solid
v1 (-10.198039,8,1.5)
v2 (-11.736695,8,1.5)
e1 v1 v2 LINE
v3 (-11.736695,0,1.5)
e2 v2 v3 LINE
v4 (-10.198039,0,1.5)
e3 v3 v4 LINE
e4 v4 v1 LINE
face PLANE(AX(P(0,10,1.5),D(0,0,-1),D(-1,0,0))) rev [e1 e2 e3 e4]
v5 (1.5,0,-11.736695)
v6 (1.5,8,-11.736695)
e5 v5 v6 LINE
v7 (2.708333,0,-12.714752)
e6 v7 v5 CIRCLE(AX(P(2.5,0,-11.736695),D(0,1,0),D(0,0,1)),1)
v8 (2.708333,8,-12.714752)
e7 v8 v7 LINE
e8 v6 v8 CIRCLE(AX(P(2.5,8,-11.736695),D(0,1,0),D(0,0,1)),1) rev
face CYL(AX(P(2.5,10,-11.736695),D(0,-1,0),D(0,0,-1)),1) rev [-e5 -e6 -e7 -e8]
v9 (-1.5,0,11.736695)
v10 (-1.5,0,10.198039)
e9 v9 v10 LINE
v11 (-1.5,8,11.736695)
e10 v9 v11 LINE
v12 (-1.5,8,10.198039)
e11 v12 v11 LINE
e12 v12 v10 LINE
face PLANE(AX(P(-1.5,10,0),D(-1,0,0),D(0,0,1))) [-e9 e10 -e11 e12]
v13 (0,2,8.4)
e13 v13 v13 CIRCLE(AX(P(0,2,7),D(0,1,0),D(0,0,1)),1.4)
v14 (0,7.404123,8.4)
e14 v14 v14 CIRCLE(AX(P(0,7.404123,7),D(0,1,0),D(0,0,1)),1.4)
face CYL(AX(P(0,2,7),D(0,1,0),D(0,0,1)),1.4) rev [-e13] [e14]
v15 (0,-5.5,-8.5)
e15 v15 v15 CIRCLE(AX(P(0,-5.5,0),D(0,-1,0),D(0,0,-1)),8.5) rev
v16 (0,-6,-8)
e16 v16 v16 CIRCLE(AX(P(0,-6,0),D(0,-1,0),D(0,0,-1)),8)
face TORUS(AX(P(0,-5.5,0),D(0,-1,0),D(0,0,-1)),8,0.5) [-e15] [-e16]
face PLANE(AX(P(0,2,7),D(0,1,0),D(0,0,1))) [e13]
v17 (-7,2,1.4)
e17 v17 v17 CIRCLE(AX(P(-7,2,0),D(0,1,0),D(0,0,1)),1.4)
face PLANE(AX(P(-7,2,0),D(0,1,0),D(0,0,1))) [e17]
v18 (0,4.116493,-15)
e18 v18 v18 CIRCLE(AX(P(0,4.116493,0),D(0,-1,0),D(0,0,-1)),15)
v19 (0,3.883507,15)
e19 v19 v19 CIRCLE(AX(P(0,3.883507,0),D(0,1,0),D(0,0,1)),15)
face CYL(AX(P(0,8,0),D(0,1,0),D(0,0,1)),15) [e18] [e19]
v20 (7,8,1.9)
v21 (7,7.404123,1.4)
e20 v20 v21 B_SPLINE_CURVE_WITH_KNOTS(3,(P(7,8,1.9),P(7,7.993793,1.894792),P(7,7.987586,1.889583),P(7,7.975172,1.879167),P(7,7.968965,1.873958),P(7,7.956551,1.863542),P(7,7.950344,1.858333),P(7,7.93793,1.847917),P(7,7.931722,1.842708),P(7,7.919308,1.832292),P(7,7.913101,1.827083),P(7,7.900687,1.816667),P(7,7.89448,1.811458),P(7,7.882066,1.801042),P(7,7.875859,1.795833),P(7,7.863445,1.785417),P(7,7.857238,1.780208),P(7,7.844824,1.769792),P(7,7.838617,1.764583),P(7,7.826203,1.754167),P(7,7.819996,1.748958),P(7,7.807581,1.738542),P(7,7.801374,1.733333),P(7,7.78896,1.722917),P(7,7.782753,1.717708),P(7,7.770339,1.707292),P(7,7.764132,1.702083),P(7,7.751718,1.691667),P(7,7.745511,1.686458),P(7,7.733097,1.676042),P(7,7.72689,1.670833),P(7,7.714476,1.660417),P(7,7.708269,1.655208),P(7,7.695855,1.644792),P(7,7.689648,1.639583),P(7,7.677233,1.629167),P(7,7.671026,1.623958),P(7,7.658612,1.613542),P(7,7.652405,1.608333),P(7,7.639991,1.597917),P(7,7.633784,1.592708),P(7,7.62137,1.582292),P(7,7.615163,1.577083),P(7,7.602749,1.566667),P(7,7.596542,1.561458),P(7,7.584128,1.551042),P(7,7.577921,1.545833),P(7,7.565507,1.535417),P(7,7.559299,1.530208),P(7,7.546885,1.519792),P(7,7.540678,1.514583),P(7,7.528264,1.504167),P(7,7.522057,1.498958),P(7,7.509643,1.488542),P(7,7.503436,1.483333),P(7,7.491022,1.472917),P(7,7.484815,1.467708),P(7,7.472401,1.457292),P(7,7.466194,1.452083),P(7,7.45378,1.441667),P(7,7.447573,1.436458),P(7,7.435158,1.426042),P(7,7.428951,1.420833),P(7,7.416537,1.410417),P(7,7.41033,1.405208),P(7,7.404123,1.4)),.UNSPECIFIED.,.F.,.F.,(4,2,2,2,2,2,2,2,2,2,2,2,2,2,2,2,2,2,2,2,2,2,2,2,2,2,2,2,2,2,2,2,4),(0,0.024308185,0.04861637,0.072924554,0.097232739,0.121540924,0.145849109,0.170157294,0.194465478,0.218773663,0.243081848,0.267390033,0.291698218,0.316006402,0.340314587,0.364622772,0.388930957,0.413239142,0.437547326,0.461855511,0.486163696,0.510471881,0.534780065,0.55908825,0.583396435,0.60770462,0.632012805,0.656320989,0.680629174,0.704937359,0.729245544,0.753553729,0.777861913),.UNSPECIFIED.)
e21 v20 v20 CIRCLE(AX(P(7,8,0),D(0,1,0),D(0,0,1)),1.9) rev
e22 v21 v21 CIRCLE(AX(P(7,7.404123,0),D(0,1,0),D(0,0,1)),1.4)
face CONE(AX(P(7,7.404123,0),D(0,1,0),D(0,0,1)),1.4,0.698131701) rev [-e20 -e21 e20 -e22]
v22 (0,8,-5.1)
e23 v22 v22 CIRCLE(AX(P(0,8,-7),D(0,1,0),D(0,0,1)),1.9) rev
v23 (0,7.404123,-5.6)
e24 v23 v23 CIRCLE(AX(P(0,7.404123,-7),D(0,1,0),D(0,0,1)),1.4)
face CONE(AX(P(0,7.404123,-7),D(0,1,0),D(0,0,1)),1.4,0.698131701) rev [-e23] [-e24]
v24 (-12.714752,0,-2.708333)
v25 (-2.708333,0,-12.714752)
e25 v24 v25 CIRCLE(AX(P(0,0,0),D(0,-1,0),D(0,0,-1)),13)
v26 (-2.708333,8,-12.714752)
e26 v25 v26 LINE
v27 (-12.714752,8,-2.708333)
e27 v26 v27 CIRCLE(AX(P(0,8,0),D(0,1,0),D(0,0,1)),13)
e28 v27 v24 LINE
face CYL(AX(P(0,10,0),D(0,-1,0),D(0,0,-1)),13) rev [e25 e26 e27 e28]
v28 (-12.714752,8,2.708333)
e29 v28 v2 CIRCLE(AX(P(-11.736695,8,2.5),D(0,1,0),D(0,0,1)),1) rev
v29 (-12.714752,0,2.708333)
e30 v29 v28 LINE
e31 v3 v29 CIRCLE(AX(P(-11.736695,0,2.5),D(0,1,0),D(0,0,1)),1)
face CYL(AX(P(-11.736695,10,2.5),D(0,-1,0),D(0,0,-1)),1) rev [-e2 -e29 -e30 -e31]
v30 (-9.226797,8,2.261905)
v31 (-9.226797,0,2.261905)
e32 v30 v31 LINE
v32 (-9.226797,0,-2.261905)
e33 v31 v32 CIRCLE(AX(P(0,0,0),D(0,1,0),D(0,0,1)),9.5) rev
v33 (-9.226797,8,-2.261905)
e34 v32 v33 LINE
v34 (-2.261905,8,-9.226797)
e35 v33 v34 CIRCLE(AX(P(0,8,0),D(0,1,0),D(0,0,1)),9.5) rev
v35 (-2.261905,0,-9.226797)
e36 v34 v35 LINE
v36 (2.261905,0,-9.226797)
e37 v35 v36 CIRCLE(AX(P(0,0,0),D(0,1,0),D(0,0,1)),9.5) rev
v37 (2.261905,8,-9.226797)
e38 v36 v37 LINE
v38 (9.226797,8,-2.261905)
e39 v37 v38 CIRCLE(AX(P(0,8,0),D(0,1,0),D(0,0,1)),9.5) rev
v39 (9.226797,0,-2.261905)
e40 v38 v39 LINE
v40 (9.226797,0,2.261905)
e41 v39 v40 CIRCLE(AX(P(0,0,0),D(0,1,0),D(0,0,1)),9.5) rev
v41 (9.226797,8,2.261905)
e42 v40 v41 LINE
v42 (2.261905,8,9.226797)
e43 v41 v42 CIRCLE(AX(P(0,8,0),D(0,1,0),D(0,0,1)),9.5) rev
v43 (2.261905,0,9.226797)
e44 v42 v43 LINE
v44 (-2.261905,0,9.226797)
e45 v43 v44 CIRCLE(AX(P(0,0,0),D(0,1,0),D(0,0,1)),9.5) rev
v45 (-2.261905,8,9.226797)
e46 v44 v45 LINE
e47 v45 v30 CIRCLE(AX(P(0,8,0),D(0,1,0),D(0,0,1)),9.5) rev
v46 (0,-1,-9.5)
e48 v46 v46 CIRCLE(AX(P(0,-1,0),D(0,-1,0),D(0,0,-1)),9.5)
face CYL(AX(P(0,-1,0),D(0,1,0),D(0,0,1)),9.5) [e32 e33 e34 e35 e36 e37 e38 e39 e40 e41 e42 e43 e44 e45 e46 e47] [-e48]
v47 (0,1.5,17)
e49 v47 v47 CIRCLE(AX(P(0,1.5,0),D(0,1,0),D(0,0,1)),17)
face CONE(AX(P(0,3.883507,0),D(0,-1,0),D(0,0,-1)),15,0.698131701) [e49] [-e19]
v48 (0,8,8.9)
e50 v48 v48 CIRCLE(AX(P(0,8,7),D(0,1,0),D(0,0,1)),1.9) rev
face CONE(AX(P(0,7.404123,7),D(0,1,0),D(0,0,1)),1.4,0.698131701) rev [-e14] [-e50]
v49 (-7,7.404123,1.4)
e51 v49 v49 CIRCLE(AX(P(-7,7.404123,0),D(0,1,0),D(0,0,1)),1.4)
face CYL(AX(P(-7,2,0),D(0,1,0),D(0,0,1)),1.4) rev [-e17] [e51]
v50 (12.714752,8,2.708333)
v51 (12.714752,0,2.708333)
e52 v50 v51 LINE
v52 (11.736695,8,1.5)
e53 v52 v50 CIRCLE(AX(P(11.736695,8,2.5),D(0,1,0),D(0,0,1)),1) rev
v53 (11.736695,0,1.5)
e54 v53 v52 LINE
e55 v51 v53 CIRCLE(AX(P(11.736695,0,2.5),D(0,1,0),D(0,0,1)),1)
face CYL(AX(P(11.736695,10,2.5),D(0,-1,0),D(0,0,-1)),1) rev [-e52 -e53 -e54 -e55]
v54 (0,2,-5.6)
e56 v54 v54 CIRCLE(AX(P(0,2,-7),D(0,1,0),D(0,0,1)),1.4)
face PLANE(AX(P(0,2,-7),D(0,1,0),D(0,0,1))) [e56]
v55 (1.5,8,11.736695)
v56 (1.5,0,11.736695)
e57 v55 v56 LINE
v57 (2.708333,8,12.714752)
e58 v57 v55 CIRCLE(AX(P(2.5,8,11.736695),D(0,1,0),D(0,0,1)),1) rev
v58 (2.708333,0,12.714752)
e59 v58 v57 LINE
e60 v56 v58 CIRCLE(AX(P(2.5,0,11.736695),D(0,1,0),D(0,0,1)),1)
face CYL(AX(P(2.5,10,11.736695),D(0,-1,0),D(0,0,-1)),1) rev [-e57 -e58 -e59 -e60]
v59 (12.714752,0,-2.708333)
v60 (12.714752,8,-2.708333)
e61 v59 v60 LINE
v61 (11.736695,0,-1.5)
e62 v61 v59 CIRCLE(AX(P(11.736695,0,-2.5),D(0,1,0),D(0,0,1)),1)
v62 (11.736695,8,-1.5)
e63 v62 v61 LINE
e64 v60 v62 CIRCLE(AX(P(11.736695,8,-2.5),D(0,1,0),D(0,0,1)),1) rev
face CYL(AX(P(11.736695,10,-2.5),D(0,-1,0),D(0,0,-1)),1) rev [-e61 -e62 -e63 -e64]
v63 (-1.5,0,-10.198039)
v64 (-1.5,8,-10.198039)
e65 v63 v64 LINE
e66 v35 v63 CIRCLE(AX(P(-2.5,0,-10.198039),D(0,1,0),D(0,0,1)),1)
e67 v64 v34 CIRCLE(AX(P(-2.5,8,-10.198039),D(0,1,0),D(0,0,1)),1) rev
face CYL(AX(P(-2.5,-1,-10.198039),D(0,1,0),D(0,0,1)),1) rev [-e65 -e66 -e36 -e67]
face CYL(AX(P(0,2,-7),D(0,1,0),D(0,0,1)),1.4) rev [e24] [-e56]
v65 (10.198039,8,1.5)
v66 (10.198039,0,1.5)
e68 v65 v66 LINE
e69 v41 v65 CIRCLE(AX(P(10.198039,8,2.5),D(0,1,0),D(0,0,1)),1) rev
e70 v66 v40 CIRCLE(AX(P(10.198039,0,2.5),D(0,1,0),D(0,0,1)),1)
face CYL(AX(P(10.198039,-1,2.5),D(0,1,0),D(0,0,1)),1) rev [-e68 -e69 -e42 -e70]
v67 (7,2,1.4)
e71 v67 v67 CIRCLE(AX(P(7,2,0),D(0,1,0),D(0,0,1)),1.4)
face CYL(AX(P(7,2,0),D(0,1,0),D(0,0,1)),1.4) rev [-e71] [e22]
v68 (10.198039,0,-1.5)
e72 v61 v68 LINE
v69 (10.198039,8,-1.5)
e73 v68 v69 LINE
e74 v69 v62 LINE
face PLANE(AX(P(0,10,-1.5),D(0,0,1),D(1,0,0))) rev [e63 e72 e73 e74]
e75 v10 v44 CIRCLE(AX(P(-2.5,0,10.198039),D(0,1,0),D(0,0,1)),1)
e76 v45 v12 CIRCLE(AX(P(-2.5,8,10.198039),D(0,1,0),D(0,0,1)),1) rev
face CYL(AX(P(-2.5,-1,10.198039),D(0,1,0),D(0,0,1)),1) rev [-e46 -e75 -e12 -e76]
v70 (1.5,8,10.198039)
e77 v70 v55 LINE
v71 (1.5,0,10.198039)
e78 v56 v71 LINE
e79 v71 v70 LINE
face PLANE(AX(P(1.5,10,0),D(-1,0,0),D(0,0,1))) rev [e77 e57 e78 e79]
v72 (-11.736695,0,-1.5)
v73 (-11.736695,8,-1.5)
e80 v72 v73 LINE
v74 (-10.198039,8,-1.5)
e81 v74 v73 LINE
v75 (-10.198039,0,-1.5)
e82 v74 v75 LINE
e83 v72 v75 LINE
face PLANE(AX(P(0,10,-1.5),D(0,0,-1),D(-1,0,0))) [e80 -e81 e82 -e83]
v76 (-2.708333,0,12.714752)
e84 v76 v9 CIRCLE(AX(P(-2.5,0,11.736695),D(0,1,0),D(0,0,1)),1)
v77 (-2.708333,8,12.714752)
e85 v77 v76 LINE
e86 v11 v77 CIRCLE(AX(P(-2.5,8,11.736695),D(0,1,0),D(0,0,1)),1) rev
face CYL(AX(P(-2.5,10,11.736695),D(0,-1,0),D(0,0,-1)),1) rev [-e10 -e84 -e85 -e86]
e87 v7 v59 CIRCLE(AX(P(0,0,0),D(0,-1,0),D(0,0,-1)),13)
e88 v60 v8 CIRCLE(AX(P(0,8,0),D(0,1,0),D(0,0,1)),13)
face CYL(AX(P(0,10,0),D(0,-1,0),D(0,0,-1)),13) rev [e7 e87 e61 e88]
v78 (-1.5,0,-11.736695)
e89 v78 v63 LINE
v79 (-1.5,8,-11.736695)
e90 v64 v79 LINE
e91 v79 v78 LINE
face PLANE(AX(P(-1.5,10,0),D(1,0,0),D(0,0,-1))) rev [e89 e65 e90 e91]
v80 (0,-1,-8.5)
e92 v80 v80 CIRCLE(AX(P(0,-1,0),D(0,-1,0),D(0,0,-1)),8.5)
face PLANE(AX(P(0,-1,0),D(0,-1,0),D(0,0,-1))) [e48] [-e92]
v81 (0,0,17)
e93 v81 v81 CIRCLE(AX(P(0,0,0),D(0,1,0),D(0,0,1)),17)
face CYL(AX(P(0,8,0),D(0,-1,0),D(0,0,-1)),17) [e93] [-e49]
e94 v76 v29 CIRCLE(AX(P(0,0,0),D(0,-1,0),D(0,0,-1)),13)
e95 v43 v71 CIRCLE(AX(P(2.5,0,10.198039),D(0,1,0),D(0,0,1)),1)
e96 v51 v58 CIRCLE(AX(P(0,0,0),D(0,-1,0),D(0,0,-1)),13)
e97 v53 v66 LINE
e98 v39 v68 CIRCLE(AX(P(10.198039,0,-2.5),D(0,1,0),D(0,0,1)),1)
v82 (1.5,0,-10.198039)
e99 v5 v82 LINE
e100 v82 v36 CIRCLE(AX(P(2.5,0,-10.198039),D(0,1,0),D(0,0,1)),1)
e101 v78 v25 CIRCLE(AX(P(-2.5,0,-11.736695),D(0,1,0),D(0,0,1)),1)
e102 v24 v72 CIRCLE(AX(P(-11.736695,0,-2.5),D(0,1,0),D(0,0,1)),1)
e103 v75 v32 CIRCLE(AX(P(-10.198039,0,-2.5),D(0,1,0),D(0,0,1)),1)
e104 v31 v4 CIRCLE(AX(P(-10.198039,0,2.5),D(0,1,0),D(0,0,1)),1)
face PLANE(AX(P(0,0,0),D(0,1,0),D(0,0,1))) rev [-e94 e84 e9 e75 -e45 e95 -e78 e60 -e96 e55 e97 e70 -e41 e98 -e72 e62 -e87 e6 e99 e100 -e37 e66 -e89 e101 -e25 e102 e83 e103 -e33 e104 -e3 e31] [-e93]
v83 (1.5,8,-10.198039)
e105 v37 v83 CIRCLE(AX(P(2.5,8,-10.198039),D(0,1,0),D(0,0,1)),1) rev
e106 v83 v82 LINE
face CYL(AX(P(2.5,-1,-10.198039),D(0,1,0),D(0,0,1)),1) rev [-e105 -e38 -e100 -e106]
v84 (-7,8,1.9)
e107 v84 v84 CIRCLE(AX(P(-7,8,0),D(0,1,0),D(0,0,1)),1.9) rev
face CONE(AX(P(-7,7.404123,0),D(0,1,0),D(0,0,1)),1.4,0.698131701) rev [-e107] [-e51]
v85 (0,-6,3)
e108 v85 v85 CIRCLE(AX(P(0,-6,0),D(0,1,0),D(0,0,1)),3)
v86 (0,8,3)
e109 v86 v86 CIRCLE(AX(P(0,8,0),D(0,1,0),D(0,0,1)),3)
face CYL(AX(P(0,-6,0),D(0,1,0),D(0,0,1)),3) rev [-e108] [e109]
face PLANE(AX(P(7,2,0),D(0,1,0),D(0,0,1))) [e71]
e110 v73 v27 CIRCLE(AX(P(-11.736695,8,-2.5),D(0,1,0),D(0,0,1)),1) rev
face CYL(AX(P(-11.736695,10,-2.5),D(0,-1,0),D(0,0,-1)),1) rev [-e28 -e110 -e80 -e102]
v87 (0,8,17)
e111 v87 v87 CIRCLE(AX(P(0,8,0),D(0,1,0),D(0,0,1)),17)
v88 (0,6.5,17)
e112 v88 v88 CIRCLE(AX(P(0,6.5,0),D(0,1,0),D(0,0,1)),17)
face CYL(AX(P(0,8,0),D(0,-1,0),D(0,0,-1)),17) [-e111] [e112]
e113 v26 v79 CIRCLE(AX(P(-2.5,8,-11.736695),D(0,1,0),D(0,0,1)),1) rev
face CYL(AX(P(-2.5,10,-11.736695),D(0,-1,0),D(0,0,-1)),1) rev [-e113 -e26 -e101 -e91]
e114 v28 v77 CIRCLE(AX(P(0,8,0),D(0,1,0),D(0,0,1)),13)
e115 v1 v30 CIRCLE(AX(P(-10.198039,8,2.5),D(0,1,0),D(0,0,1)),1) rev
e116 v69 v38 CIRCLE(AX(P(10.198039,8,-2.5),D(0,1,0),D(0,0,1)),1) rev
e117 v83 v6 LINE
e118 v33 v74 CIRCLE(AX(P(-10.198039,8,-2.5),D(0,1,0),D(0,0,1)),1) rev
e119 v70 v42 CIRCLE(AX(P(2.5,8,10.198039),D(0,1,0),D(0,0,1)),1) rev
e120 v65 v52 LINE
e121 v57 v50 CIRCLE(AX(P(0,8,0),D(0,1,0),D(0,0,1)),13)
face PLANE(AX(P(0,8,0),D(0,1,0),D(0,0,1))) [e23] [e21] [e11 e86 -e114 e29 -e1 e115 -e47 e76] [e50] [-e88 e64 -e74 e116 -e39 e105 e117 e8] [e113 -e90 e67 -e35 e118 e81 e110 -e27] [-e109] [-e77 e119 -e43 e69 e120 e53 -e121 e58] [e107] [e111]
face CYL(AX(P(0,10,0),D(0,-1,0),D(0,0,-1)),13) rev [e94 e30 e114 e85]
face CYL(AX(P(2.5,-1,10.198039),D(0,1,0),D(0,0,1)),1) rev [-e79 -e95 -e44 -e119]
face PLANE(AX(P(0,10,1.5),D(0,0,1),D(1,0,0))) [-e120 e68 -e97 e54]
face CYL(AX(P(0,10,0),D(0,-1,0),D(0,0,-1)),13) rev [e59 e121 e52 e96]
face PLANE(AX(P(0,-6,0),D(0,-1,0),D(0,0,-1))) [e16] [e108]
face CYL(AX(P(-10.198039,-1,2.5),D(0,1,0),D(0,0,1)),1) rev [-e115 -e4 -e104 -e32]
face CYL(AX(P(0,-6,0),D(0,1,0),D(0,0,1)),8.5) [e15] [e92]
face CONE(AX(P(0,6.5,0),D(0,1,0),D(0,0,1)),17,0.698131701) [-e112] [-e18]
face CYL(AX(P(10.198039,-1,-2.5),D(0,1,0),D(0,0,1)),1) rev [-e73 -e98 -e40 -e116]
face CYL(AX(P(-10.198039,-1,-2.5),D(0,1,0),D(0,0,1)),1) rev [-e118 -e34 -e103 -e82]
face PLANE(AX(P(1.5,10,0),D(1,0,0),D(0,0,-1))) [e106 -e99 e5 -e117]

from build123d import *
from OCP.BRepFilletAPI import BRepFilletAPI_MakeChamfer

# Parameters (mm, degrees)
SKETCH_1_R          = 17
SKETCH_1_R_2        = 1.4
EXTRUDE_1_DEPTH     = 8
SKETCH_2_W          = 2
SKETCH_2_H          = 5
SKETCH_5_R          = 1.4
CUT_EXTRUDE_3_DEPTH = 6
SKETCH_6_R          = 8.5
EXTRUDE_2_DEPTH     = 6
SKETCH_4_R          = 3
CUT_EXTRUDE_2_DEPTH = 28.820855486
SKETCH_7_R          = 9.5
SKETCH_7_R_2        = 8.5
EXTRUDE_3_DEPTH     = 1
CHAMFER_1_SIZE      = 2.383507185
CHAMFER_1_SIZE_2    = 2
FILLET_1_R          = 0.5
CUT_EXTRUDE_START   = -10
CUT_EXTRUDE_4_DEPTH = 10
FILLET_2_R          = 1
CHAMFER_2_SIZE      = 0.5
CHAMFER_2_SIZE2     = 0.595876796


with BuildPart() as part:
    # 草图1 → 凸台-拉伸1 (new body)
    # profile 1 of 5: a face of its own
    with BuildSketch(Plane(origin=(0, 0, 0), x_dir=(1, 0, 0), z_dir=(0, 1, 0))):
        with Locations(Location((0, 0, 0), (0, 0, 270))):
            Circle(SKETCH_1_R)
        with Locations((-7, 0)):
            Circle(SKETCH_1_R_2, mode=Mode.SUBTRACT)
        with Locations((0, -7)):
            Circle(SKETCH_1_R_2, mode=Mode.SUBTRACT)
        with Locations((7, 0)):
            Circle(SKETCH_1_R_2, mode=Mode.SUBTRACT)
        with Locations((0, 7)):
            Circle(SKETCH_1_R_2, mode=Mode.SUBTRACT)
    # profile 2 of 5: a face of its own
    with BuildSketch(Plane(origin=(0, 0, 0), x_dir=(1, 0, 0), z_dir=(0, 1, 0))):
        with Locations((0, 7)):
            Circle(SKETCH_1_R_2)
    # profile 3 of 5: a face of its own
    with BuildSketch(Plane(origin=(0, 0, 0), x_dir=(1, 0, 0), z_dir=(0, 1, 0))):
        with Locations((-7, 0)):
            Circle(SKETCH_1_R_2)
    # profile 4 of 5: a face of its own
    with BuildSketch(Plane(origin=(0, 0, 0), x_dir=(1, 0, 0), z_dir=(0, 1, 0))):
        with Locations((0, -7)):
            Circle(SKETCH_1_R_2)
    # profile 5 of 5: a face of its own
    with BuildSketch(Plane(origin=(0, 0, 0), x_dir=(1, 0, 0), z_dir=(0, 1, 0))):
        with Locations((7, 0)):
            Circle(SKETCH_1_R_2)
    extrude(amount=EXTRUDE_1_DEPTH)

    # 草图2 → 切除-旋转1 (revolve, cut)
    with BuildSketch(Plane.XY, mode=Mode.PRIVATE) as cut_revolve_1_sk:
        with Locations((16, 4)):
            Rectangle(SKETCH_2_W, SKETCH_2_H)
    revolve(cut_revolve_1_sk.sketch.rotate(Axis((0, 8, 0), (0, -1, 0)), 90), axis=Axis((0, 8, 0), (0, -1, 0)), mode=Mode.SUBTRACT)

    # 草图5 → 切除-拉伸3 (cut)
    with BuildSketch(Plane(origin=(0, 8, 0), x_dir=(1, 0, 0), z_dir=(0, 1, 0))):
        with Locations(Location((0, 7, 0), (0, 0, 270))):
            Circle(SKETCH_5_R)
        with Locations(Location((7, 0, 0), (0, 0, 270))):
            Circle(SKETCH_5_R)
        with Locations(Location((0, -7, 0), (0, 0, 270))):
            Circle(SKETCH_5_R)
        with Locations(Location((-7, 0, 0), (0, 0, 270))):
            Circle(SKETCH_5_R)
    extrude(amount=-CUT_EXTRUDE_3_DEPTH, mode=Mode.SUBTRACT)

    # 草图6 → 凸台-拉伸2 (add)
    with BuildSketch(Plane.XZ):
        with Locations(Location((0, 0, 0), (0, 0, 270))):
            Circle(SKETCH_6_R)
    extrude(amount=EXTRUDE_2_DEPTH)

    # 草图4 → 切除-拉伸2 (cut, through all)
    with BuildSketch(Plane(origin=(0, 8, 0), x_dir=(1, 0, 0), z_dir=(0, 1, 0))):
        with Locations(Location((0, 0, 0), (0, 0, 270))):
            Circle(SKETCH_4_R)
    extrude(amount=-CUT_EXTRUDE_2_DEPTH, mode=Mode.SUBTRACT)

    # 草图7 → 凸台-拉伸3 (add)
    with BuildSketch(Plane.XZ):
        with Locations(Location((0, 0, 0), (0, 0, 90))):
            Circle(SKETCH_7_R)
        with Locations(Location((0, 0, 0), (0, 0, 270))):
            Circle(SKETCH_7_R_2, mode=Mode.SUBTRACT)
    extrude(amount=EXTRUDE_3_DEPTH)

    # 倒角1
    chamfer_1_edges_1 = [part.edges().sort_by_distance(p)[0] for p in [
        (0, 6.5, -15),
    ]]
    chamfer_1_side_1 = [part.faces().sort_by_distance(p)[0] for p in [
        (0, 6.46, -15),
    ]]
    chamfer_1_edges_2 = [part.edges().sort_by_distance(p)[0] for p in [
        (0, 1.5, -15),
    ]]
    chamfer_1_side_2 = [part.faces().sort_by_distance(p)[0] for p in [
        (0, 1.5, -15.04),
    ]]
    chamfer_1 = BRepFilletAPI_MakeChamfer(part.part.solid().wrapped)
    for e in chamfer_1_edges_1:
        chamfer_1.Add(CHAMFER_1_SIZE - 0.0001, CHAMFER_1_SIZE_2 - 0.0001, e.wrapped, chamfer_1_side_1[0].wrapped)
    for e in chamfer_1_edges_2:
        chamfer_1.Add(CHAMFER_1_SIZE_2 - 0.0001, CHAMFER_1_SIZE - 0.0001, e.wrapped, chamfer_1_side_2[0].wrapped)
    add(Compound.cast(chamfer_1.Shape()), mode=Mode.REPLACE)  # a hair under: the kernel refuses the full size

    # 圆角1
    fillet_1_edges = [part.edges().sort_by_distance(p)[0] for p in [
        (0, -6, 8.5),
    ]]
    fillet(fillet_1_edges, radius=FILLET_1_R)

    # 草图8 → 切除-拉伸4 (cut)
    with BuildSketch(Plane.XZ.offset(CUT_EXTRUDE_START)):
        with BuildLine():
            Line((-1.5, 9.38083152), (-1.5, 12.91317157))
            ThreePointArc((-1.5, 12.91317157), (-9.192388155, 9.192388155), (-12.91317157, 1.5))
            Line((-12.91317157, 1.5), (-9.38083152, 1.5))
            ThreePointArc((-9.38083152, 1.5), (-6.717514421, 6.717514421), (-1.5, 9.38083152))
        make_face()
        with BuildLine():
            Line((-9.38083152, -1.5), (-12.91317157, -1.5))
            ThreePointArc((-12.91317157, -1.5), (-9.192388155, -9.192388155), (-1.5, -12.91317157))
            Line((-1.5, -12.91317157), (-1.5, -9.38083152))
            ThreePointArc((-1.5, -9.38083152), (-6.717514421, -6.717514421), (-9.38083152, -1.5))
        make_face()
        with BuildLine():
            ThreePointArc((1.5, -12.91317157), (9.192388155, -9.192388155), (12.91317157, -1.5))
            Line((12.91317157, -1.5), (9.38083152, -1.5))
            ThreePointArc((9.38083152, -1.5), (6.717514421, -6.717514421), (1.5, -9.38083152))
            Line((1.5, -9.38083152), (1.5, -12.91317157))
        make_face()
        with BuildLine():
            ThreePointArc((12.91317157, 1.5), (9.192388155, 9.192388155), (1.5, 12.91317157))
            Line((1.5, 12.91317157), (1.5, 9.38083152))
            ThreePointArc((1.5, 9.38083152), (6.717514421, 6.717514421), (9.38083152, 1.5))
            Line((9.38083152, 1.5), (12.91317157, 1.5))
        make_face()
    extrude(amount=CUT_EXTRUDE_4_DEPTH, mode=Mode.SUBTRACT)

    # 圆角2
    fillet_2_edges = [part.edges().sort_by_distance(p)[0] for p in [
        (-1.5, 4, 12.91317157),
        (-1.5, 4, 9.38083152),
        (-9.38083152, 4, 1.5),
        (-12.91317157, 4, 1.5),
        (12.91317157, 4, 1.5),
        (9.38083152, 4, 1.5),
        (1.5, 4, 9.38083152),
        (1.5, 4, 12.91317157),
        (1.5, 4, -12.91317157),
        (1.5, 4, -9.38083152),
        (9.38083152, 4, -1.5),
        (12.91317157, 4, -1.5),
        (-12.91317157, 4, -1.5),
        (-9.38083152, 4, -1.5),
        (-1.5, 4, -9.38083152),
        (-1.5, 4, -12.91317157),
    ]]
    fillet(fillet_2_edges, radius=FILLET_2_R)

    # 倒角2
    chamfer_2_edges = [part.edges().sort_by_distance(p)[0] for p in [
        (0, 8, -8.4),
        (7, 8, -1.4),
        (0, 8, 5.6),
        (-7, 8, -1.4),
    ]]
    chamfer_2_side = [part.faces().sort_by_distance(p)[0] for p in [
        (-10.967366811, 8, 1.019167389),
    ]]
    chamfer(chamfer_2_edges, length=CHAMFER_2_SIZE, length2=CHAMFER_2_SIZE2, reference=chamfer_2_side[0])


solid = part.part
